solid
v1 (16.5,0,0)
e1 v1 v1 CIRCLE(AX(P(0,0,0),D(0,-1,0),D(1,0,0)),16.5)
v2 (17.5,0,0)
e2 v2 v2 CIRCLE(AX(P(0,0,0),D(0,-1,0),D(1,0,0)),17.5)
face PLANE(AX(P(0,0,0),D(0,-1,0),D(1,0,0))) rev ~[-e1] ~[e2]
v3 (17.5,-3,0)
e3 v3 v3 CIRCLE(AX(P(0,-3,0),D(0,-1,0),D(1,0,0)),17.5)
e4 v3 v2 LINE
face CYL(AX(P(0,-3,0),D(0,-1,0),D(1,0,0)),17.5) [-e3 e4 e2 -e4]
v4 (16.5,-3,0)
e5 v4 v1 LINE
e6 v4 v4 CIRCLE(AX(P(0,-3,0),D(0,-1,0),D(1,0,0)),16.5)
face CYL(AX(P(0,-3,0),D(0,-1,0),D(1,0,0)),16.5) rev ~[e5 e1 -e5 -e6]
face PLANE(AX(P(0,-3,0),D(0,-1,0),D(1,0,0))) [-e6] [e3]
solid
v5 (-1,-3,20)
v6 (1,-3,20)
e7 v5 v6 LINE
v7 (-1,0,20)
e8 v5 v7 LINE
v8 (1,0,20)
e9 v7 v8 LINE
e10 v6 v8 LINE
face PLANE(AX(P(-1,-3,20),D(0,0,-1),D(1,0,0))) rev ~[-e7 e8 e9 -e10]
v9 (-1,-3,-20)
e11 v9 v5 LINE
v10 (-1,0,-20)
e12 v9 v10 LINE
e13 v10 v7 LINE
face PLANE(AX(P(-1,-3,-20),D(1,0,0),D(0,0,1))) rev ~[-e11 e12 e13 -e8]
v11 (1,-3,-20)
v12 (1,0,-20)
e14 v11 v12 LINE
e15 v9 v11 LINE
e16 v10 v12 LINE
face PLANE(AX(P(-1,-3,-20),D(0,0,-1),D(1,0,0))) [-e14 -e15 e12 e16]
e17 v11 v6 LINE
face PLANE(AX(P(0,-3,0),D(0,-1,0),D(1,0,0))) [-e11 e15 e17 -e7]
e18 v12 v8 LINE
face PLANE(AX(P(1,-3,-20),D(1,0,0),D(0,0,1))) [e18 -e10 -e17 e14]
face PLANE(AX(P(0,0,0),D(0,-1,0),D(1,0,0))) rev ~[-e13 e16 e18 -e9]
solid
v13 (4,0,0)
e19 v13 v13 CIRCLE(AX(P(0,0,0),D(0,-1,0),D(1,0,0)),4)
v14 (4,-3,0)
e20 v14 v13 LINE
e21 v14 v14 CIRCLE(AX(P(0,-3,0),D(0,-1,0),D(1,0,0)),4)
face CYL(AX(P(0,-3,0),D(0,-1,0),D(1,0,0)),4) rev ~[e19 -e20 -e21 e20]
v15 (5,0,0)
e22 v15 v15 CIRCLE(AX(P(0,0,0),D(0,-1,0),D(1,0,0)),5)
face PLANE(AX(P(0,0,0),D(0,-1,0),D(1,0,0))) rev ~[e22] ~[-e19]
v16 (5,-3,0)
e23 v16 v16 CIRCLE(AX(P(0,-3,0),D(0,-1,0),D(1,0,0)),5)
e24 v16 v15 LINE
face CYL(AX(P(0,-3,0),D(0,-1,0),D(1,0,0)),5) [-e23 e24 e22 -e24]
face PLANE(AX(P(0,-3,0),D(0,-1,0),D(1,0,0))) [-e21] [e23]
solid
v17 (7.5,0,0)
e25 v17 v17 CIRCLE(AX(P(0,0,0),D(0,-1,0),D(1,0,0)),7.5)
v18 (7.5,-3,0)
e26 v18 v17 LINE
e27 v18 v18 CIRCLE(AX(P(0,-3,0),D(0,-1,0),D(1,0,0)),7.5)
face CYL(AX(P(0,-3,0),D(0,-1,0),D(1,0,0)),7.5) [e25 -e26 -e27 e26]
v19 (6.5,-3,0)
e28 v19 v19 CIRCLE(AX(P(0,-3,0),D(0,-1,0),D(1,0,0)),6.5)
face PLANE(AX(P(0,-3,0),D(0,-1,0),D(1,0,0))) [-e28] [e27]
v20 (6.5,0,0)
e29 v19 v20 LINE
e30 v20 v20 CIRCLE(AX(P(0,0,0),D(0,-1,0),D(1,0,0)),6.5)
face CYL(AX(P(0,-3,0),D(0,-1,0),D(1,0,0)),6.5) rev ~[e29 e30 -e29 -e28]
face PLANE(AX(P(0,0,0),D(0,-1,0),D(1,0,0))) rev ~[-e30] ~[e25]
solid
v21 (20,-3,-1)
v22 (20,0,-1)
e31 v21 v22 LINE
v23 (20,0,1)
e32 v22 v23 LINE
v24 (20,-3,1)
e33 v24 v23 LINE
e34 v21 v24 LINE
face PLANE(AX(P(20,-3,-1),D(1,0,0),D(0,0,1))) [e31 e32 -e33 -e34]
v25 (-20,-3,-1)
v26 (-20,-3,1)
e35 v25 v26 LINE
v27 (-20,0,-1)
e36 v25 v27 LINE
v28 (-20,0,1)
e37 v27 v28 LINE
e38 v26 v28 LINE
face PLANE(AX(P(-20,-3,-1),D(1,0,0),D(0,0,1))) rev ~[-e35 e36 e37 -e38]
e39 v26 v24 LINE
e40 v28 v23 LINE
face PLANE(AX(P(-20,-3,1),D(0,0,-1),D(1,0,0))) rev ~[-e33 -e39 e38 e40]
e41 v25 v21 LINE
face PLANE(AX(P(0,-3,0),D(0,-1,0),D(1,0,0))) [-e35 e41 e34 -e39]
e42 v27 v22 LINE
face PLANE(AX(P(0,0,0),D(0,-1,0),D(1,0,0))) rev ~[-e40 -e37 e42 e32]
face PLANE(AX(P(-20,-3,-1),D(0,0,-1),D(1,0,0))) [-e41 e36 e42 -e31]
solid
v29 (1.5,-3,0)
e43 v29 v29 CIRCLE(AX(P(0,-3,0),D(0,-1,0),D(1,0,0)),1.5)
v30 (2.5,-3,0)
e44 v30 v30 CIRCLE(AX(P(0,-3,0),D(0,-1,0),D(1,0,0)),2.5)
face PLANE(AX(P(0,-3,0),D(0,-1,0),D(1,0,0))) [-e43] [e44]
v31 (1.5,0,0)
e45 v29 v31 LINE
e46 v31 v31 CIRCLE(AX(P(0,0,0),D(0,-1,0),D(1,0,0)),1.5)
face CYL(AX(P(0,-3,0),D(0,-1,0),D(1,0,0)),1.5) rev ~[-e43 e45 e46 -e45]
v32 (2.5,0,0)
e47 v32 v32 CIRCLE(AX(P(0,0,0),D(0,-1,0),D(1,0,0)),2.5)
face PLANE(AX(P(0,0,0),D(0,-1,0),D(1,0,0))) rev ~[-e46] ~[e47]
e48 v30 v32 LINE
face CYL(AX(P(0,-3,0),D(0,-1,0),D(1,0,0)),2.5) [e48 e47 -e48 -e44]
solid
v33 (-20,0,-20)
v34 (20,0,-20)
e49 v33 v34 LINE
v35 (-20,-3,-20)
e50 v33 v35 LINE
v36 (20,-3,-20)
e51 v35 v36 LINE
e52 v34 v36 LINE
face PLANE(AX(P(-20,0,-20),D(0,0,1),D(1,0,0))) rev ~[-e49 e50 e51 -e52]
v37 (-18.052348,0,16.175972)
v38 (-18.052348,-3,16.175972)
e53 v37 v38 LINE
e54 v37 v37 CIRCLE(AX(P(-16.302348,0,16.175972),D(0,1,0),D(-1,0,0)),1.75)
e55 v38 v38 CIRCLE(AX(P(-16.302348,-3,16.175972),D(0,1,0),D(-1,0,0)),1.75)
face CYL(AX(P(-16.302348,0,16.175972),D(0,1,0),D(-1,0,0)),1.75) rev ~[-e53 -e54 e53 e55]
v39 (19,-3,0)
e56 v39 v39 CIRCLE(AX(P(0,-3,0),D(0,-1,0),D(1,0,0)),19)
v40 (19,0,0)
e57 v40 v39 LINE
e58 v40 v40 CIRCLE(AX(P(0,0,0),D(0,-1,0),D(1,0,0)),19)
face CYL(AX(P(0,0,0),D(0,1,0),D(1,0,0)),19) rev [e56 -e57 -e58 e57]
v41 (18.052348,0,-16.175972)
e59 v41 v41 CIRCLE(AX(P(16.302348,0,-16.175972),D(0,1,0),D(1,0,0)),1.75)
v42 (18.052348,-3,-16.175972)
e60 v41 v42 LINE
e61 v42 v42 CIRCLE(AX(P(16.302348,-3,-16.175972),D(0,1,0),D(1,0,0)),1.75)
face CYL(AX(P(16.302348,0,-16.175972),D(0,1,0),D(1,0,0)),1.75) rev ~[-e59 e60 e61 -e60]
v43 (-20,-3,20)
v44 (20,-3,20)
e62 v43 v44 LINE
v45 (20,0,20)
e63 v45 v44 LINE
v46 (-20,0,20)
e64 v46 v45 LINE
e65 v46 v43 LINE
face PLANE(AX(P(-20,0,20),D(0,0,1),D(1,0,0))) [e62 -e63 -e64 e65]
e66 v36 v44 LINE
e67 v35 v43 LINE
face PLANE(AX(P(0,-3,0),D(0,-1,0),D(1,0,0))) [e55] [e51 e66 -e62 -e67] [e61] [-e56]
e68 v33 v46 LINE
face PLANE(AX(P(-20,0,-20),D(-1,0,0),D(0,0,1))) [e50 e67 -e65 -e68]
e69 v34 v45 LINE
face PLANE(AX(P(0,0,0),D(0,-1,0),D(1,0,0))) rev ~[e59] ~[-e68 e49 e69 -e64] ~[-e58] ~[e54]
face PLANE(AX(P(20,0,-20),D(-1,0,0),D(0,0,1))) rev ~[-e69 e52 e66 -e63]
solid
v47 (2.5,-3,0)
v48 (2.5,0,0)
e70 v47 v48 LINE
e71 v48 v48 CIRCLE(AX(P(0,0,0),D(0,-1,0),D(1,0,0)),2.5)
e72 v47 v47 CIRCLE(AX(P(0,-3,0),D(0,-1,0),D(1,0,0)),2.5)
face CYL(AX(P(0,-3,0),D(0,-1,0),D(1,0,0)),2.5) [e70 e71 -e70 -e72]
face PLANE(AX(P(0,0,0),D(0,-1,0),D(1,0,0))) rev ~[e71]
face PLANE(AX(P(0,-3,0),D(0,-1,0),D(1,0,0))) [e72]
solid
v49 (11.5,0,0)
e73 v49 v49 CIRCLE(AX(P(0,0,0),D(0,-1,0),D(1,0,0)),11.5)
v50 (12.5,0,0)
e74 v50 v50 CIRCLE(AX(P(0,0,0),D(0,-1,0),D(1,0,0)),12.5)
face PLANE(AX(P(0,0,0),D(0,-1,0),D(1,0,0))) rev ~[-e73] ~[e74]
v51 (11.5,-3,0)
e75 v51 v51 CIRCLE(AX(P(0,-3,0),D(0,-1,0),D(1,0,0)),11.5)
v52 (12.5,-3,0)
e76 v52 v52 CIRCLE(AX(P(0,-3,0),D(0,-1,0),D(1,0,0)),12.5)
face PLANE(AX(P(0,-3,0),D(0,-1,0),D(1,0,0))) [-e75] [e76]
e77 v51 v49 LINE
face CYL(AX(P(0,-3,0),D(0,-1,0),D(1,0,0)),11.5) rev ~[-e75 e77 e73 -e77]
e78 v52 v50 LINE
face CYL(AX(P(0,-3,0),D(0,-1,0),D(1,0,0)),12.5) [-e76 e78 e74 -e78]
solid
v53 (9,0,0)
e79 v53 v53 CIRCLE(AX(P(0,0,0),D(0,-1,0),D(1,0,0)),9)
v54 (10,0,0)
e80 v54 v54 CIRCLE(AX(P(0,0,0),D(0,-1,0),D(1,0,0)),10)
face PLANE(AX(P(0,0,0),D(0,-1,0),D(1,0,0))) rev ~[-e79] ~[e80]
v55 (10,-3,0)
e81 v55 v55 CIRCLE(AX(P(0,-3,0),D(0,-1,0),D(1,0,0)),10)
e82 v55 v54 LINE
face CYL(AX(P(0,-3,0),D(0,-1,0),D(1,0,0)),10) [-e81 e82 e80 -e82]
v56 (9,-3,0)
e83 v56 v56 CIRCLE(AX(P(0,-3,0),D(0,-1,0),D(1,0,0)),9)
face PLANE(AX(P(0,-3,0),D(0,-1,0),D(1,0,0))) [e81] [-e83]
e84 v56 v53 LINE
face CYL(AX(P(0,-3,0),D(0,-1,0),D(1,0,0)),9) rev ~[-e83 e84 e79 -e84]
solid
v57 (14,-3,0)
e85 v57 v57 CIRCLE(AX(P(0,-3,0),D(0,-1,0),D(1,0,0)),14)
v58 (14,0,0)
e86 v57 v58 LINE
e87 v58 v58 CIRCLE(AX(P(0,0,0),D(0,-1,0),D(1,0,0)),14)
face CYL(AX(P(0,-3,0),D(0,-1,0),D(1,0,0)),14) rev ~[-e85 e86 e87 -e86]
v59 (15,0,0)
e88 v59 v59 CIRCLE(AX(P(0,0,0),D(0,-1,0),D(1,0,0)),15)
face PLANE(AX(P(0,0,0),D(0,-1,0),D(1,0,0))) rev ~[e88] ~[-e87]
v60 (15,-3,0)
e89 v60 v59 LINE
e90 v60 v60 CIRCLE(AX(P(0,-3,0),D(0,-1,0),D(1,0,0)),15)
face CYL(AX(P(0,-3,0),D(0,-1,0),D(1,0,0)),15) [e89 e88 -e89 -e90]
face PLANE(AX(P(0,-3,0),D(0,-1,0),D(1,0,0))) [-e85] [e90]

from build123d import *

# Parameters (mm, degrees)
F0_W      = 40
F0_H      = 40
F0_R      = 19
F1_DEPTH  = 3
F2_R      = 1.75
F3_DEPTH  = 5
F6_COUNT  = 2
F8_R      = 10
F8_R_2    = 9
F18_DEPTH = 3
F9_R      = 5
F9_R_2    = 4
F10_R     = 7.5
F10_R_2   = 6.5
F11_R     = 2.5
F11_R_2   = 1.5
F12_R     = 2.5
F13_R     = 12.5
F13_R_2   = 11.5
F14_R     = 15
F14_R_2   = 14
F15_R     = 17.5
F15_R_2   = 16.5
F16_W     = 2
F16_H     = 40
F17_W     = 40
F17_H     = 2


# Not quite as in the source:
# - a feature names something its author has since deleted; it is built from what else it names


with BuildPart() as f1:
    # F0 (on Front) → F1 (new body)
    with BuildSketch(Plane.XZ):
        Rectangle(F0_W, F0_H)
        Circle(F0_R, mode=Mode.SUBTRACT)
    extrude(amount=F1_DEPTH)


with BuildPart() as f3:
    # F2 (on face) → F3 (new body)
    with BuildSketch(Plane(origin=(0, 0, 0), x_dir=(-1, 0, 0), z_dir=(0, 1, 0))):
        with Locations((16.3023483751, 16.1759720192)):
            Circle(F2_R)
    extrude(amount=-F3_DEPTH)


with BuildPart() as f6_1:
    # F6: instance of F3
    add(f3.part.rotate(Axis((0, -5.2183736116, 0), (0, -1, 0)), 1 * 360 / F6_COUNT))


with BuildPart() as f1_1:
    add(f1.part)

    # F7: cut F6_1, F3
    add(f6_1.part, mode=Mode.SUBTRACT)
    add(f3.part, mode=Mode.SUBTRACT)


with BuildPart() as f18:
    # F8 (on face) → F18 (new body)
    with BuildSketch(Plane.XZ.offset(3)):
        Circle(F8_R)
        Circle(F8_R_2, mode=Mode.SUBTRACT)
    extrude(amount=-F18_DEPTH)


with BuildPart() as f18b:
    # F9 (on face) → F18, piece 2 (new body)
    with BuildSketch(Plane.XZ.offset(3)):
        Circle(F9_R)
        Circle(F9_R_2, mode=Mode.SUBTRACT)
    extrude(amount=-F18_DEPTH)


with BuildPart() as f18c:
    # F10 (on face) → F18, piece 3 (new body)
    with BuildSketch(Plane.XZ.offset(3)):
        Circle(F10_R)
        Circle(F10_R_2, mode=Mode.SUBTRACT)
    extrude(amount=-F18_DEPTH)


with BuildPart() as f18d:
    # F11 (on face) → F18, piece 4 (new body)
    with BuildSketch(Plane.XZ.offset(3)):
        Circle(F11_R)
        Circle(F11_R_2, mode=Mode.SUBTRACT)
    extrude(amount=-F18_DEPTH)


with BuildPart() as f18e:
    # F12 (on face) → F18, piece 5 (new body)
    with BuildSketch(Plane.XZ.offset(3)):
        Circle(F12_R)
    extrude(amount=-F18_DEPTH)


with BuildPart() as f18f:
    # F13 (on face) → F18, piece 6 (new body)
    with BuildSketch(Plane.XZ.offset(3)):
        Circle(F13_R)
        Circle(F13_R_2, mode=Mode.SUBTRACT)
    extrude(amount=-F18_DEPTH)


with BuildPart() as f18g:
    # F14 (on face) → F18, piece 7 (new body)
    with BuildSketch(Plane.XZ.offset(3)):
        Circle(F14_R)
        Circle(F14_R_2, mode=Mode.SUBTRACT)
    extrude(amount=-F18_DEPTH)


with BuildPart() as f18h:
    # F15 (on face) → F18, piece 8 (new body)
    with BuildSketch(Plane.XZ.offset(3)):
        Circle(F15_R)
        Circle(F15_R_2, mode=Mode.SUBTRACT)
    extrude(amount=-F18_DEPTH)


with BuildPart() as f18i:
    # F16 (on face) → F18, piece 9 (new body)
    with BuildSketch(Plane.XZ.offset(3)):
        Rectangle(F16_W, F16_H)
    extrude(amount=-F18_DEPTH)


with BuildPart() as f18j:
    # F17 (on face) → F18, piece 10 (new body)
    with BuildSketch(Plane.XZ.offset(3)):
        Rectangle(F17_W, F17_H)
    extrude(amount=-F18_DEPTH)


solid = Compound([f1_1.part, f18.part, f18b.part, f18c.part, f18d.part, f18e.part, f18f.part, f18g.part, f18h.part, f18i.part, f18j.part])
